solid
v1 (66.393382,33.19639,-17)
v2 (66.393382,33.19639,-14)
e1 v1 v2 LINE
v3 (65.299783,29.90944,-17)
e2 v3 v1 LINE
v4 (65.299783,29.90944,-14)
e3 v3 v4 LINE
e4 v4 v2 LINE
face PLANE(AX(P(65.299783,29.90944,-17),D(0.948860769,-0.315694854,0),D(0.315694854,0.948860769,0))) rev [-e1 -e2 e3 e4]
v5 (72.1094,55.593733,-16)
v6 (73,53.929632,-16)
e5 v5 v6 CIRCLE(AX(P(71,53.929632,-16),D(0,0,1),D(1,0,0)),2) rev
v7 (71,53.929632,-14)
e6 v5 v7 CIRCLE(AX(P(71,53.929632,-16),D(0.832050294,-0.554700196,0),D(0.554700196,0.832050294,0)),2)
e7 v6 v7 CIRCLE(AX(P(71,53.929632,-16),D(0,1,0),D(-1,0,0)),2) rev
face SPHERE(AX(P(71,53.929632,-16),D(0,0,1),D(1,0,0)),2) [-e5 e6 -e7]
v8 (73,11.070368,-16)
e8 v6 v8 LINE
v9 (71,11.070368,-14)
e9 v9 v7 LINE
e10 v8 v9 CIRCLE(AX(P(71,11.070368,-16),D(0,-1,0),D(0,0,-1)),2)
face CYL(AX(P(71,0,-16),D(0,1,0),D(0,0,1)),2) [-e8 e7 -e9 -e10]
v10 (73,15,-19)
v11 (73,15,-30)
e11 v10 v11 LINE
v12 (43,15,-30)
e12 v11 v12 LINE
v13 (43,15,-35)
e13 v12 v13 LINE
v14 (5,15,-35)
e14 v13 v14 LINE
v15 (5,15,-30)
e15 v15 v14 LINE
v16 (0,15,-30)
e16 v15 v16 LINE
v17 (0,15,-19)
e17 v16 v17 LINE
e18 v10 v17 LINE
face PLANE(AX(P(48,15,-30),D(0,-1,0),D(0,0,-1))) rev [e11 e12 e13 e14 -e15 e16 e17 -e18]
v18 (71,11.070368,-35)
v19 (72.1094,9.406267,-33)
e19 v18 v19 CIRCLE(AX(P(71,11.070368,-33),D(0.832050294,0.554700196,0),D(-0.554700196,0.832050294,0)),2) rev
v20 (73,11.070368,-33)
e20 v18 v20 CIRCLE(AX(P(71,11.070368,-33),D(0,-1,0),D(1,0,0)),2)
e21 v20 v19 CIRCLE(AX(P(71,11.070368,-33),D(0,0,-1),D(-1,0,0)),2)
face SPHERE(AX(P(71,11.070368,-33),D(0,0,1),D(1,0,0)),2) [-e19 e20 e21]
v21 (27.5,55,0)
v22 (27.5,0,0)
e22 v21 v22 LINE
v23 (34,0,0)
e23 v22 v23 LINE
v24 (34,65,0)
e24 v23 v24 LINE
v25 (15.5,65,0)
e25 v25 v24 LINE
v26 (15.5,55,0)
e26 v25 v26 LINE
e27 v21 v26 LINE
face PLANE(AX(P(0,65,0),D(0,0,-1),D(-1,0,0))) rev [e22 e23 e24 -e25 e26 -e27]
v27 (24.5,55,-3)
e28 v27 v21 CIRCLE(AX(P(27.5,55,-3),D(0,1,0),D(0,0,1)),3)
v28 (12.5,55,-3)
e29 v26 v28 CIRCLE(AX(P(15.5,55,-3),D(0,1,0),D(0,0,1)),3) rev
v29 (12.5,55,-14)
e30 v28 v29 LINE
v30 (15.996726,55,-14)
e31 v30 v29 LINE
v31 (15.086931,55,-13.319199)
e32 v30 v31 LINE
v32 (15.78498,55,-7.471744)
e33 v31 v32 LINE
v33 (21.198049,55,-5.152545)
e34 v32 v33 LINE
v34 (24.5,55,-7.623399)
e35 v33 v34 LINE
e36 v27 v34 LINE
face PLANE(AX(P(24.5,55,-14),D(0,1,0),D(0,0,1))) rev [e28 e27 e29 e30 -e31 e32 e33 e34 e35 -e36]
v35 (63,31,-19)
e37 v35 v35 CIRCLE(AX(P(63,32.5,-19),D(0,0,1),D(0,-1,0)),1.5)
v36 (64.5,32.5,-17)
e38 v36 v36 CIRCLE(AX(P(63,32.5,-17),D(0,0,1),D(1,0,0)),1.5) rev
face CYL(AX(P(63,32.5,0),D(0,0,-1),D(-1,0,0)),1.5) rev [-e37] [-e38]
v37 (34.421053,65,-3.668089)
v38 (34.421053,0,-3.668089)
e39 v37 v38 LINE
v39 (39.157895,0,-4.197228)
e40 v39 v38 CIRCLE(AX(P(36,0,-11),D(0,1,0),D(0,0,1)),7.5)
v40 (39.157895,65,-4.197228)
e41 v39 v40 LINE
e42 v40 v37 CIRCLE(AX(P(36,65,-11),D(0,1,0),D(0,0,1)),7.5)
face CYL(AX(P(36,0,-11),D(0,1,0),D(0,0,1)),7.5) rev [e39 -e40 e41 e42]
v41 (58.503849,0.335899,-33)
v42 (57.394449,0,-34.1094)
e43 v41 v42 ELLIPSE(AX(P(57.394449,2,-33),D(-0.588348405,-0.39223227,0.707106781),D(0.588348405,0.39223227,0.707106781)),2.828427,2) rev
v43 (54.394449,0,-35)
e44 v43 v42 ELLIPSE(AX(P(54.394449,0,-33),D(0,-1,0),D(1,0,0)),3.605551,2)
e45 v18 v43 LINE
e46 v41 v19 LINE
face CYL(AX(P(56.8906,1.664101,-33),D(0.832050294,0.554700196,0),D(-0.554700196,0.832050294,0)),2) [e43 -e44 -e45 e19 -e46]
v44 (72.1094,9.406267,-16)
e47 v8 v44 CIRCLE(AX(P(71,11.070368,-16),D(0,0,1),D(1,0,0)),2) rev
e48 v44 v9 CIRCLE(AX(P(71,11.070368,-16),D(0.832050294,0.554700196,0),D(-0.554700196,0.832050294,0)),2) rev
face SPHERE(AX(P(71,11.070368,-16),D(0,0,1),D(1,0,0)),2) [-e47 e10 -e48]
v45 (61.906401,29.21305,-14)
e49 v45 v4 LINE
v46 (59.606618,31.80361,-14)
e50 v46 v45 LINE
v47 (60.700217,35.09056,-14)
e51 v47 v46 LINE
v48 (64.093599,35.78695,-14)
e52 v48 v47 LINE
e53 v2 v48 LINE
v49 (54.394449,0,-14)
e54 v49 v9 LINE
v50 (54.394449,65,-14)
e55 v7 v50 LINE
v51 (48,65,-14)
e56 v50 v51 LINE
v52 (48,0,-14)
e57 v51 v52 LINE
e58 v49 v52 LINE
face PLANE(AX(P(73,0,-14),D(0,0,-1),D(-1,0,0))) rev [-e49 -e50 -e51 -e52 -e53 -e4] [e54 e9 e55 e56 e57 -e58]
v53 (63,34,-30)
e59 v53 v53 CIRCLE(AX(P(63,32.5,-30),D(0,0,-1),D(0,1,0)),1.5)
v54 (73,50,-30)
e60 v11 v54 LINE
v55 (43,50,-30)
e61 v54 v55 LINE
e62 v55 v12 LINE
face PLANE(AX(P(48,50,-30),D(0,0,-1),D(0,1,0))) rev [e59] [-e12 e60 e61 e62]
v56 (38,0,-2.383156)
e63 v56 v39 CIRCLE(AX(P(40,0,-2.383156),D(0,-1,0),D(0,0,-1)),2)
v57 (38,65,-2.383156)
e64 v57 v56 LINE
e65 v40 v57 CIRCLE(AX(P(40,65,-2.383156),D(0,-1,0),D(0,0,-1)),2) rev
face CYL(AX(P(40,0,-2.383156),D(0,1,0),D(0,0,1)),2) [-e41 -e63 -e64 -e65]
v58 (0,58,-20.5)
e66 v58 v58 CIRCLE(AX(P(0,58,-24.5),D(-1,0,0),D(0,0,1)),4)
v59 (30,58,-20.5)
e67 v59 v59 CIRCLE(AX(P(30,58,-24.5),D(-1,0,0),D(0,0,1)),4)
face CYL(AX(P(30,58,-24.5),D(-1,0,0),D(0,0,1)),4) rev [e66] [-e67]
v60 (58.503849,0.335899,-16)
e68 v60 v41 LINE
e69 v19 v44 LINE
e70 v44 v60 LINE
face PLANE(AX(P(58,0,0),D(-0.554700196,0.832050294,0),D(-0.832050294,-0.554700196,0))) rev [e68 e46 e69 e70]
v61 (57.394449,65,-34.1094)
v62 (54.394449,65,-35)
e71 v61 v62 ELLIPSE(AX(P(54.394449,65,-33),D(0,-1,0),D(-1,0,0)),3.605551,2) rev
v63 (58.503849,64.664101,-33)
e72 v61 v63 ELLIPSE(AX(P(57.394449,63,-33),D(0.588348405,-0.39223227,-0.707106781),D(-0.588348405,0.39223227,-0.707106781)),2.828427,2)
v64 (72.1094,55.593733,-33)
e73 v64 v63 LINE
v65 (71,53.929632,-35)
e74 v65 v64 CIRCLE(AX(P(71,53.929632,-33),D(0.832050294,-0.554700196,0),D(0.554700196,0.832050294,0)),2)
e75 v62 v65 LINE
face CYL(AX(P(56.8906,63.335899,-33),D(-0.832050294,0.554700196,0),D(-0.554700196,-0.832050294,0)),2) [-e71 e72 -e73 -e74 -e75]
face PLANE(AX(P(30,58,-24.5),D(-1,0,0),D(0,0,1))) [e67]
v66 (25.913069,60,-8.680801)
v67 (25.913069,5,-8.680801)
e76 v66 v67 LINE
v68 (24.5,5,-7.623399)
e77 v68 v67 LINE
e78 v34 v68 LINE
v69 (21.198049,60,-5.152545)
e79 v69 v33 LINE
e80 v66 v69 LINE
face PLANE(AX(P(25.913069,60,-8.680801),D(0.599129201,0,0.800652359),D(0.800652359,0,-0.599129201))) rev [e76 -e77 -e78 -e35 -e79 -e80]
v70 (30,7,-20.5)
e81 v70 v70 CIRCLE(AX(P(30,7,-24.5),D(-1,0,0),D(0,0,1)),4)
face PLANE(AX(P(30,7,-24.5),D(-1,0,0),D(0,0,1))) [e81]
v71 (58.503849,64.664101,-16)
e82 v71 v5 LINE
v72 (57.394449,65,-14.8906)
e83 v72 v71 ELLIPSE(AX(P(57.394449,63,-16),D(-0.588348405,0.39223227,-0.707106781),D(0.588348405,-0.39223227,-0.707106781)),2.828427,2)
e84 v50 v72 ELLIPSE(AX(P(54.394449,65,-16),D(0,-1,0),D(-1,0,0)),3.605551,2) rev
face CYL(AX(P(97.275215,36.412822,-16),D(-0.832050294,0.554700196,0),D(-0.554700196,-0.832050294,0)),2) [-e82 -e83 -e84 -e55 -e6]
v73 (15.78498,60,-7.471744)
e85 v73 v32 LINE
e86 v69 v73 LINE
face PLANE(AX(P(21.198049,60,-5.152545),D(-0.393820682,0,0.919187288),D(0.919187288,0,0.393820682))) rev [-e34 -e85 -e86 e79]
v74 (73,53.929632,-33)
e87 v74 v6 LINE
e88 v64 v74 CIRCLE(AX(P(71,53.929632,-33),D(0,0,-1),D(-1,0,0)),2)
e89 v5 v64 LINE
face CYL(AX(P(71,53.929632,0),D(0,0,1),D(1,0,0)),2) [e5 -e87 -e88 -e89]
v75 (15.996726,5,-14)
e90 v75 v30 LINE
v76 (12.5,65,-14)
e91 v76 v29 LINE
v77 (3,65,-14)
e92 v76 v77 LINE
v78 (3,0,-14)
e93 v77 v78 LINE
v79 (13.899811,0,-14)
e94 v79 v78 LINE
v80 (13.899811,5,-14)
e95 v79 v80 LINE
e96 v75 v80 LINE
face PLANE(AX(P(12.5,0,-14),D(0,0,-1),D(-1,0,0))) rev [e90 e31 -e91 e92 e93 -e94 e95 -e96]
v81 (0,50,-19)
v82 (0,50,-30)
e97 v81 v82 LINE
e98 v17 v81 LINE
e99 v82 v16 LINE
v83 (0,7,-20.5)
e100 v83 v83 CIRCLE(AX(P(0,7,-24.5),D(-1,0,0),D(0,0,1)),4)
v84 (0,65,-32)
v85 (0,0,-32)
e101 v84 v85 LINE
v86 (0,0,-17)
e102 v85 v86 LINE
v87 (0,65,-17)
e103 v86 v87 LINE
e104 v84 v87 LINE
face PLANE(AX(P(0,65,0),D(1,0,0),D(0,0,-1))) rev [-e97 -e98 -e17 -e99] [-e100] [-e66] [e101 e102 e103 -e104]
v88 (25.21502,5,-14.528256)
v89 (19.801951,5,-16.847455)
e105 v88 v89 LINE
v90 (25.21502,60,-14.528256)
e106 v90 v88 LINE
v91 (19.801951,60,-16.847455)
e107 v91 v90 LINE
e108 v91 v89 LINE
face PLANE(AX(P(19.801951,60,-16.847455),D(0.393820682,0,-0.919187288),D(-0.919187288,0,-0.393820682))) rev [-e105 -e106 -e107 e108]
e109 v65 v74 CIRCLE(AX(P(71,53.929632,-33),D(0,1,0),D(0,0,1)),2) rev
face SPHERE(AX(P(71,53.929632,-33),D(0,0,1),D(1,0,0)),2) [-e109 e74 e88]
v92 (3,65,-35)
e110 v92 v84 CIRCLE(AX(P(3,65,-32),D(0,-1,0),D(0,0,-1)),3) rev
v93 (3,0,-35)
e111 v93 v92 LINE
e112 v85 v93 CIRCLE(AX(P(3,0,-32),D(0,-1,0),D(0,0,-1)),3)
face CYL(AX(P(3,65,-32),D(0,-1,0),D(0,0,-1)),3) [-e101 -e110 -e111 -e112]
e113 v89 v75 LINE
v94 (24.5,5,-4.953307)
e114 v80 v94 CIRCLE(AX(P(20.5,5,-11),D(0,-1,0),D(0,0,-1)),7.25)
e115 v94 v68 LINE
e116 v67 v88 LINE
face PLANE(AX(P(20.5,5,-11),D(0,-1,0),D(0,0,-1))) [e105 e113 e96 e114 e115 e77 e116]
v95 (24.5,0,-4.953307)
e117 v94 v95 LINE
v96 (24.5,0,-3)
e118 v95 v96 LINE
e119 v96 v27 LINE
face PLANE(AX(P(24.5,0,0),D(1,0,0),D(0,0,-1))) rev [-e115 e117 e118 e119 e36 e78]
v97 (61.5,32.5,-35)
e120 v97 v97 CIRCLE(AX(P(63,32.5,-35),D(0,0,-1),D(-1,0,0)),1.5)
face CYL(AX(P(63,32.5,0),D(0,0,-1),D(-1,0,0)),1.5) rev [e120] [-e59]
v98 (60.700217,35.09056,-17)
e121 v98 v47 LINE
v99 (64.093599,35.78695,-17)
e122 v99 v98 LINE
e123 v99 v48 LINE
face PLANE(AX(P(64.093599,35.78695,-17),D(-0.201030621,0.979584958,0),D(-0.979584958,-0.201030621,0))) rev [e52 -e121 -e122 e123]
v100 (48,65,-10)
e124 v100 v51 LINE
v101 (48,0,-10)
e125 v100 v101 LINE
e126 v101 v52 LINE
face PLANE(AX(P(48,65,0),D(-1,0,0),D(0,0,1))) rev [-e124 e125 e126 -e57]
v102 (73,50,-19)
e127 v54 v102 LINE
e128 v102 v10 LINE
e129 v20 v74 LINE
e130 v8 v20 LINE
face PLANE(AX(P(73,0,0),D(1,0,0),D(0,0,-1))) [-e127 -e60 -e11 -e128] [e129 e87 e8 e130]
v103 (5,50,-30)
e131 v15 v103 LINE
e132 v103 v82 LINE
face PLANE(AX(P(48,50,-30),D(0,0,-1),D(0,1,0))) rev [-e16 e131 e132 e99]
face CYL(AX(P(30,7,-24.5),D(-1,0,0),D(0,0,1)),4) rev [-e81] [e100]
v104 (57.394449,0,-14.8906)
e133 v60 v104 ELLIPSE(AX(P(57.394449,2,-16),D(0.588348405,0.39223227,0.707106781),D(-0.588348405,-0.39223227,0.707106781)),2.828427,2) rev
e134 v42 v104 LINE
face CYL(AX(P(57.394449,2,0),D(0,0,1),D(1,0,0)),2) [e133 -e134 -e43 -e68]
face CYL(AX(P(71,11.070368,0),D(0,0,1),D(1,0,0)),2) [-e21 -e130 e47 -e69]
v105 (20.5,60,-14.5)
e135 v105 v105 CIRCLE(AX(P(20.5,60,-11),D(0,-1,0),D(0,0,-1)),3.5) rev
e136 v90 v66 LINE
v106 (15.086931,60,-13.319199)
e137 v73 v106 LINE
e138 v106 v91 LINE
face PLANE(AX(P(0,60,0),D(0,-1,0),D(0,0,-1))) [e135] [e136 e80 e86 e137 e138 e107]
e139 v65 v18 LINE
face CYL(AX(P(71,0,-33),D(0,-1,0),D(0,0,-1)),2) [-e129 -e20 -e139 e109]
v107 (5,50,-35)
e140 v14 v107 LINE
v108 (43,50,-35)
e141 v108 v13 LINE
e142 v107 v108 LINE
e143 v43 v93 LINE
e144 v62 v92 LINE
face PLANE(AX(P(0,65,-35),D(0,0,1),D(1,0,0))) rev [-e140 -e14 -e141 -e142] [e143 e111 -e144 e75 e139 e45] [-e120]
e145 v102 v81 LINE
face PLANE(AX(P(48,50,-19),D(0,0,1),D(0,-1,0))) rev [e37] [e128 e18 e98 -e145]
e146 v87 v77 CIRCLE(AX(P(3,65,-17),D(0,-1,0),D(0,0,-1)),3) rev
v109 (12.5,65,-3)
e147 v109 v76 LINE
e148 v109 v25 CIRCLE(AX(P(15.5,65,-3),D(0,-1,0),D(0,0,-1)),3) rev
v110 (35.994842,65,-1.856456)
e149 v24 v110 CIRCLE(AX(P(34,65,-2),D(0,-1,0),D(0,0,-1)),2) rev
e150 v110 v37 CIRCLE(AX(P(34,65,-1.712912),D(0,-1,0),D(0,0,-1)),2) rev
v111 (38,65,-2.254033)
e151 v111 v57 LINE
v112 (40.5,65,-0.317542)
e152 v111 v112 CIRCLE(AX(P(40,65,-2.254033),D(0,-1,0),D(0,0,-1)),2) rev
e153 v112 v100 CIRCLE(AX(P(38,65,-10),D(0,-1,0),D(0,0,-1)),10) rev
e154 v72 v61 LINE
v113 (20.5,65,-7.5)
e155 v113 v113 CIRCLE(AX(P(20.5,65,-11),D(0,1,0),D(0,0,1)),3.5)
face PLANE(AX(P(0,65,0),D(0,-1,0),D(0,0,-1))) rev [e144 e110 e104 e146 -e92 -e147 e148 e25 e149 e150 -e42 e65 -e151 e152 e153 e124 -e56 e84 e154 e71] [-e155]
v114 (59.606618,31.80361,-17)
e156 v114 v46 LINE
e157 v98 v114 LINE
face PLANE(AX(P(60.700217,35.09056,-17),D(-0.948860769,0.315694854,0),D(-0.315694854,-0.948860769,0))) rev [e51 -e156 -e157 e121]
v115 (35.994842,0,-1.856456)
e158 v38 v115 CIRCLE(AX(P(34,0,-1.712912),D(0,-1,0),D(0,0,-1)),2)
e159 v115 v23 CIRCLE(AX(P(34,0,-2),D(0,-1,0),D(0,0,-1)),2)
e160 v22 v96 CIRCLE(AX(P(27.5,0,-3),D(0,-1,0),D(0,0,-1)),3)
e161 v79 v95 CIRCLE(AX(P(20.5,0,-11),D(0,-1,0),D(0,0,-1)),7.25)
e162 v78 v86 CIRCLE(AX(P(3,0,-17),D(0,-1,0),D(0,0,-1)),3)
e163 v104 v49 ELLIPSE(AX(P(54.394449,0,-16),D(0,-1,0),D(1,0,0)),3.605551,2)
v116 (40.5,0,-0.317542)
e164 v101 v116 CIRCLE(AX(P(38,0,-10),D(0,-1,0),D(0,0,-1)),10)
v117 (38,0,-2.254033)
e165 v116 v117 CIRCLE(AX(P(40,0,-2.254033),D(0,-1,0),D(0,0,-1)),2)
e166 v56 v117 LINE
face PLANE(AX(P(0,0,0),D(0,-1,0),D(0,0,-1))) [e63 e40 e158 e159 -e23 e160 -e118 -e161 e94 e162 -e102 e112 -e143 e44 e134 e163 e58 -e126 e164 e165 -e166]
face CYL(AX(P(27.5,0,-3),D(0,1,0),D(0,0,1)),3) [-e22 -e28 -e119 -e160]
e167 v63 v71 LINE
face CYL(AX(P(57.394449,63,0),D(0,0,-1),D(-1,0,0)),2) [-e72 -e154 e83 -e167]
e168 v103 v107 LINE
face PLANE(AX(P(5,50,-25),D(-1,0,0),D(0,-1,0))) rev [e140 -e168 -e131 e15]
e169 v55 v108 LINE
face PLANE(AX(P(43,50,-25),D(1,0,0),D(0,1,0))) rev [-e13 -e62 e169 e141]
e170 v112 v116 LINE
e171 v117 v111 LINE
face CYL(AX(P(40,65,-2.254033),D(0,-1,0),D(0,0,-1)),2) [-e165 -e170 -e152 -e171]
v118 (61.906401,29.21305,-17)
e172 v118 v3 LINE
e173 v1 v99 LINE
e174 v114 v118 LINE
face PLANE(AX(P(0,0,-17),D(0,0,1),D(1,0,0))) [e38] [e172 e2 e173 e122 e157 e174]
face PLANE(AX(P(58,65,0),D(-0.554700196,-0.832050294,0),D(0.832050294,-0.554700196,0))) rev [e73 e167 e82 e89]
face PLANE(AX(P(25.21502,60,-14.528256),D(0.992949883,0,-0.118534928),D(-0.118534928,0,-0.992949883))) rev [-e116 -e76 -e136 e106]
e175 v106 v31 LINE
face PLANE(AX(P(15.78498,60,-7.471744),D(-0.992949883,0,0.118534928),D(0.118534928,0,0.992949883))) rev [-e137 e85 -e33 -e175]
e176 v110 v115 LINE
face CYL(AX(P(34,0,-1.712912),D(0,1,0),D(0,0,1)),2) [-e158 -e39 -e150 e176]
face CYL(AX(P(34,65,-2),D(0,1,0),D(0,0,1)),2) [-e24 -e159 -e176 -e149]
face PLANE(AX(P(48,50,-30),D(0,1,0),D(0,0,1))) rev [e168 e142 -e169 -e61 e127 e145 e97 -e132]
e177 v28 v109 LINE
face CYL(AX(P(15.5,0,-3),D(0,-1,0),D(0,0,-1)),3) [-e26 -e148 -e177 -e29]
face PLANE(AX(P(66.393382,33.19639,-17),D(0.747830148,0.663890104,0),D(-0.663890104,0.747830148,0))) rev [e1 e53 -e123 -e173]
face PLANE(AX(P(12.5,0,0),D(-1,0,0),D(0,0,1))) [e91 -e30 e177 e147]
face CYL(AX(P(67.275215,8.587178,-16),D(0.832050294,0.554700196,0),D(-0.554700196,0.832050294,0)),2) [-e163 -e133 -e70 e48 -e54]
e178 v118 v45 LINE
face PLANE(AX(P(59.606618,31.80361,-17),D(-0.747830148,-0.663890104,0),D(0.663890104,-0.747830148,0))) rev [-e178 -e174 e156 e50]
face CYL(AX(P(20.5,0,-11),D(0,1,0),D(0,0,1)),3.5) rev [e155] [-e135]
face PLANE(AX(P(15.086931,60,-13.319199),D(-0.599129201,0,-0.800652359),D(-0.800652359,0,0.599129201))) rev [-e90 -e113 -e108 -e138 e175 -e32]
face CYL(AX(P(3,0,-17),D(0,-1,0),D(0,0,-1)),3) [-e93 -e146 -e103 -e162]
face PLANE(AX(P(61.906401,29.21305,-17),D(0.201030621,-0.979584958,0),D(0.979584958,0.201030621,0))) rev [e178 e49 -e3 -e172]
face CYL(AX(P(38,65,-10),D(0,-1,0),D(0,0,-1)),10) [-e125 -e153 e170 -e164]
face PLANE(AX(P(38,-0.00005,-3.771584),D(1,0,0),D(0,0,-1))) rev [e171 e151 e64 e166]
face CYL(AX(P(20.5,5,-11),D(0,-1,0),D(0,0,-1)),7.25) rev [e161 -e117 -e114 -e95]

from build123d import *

# Parameters (mm, degrees)
SKETCH1_W           = 48
SKETCH1_H           = 35
BOSS_EXTRUDE1_DEPTH = 65
SKETCH2_R           = 7.5
SKETCH2_R_2         = 3.5
CUT_EXTRUDE1_DEPTH  = 89.056799851
SKETCH3_W           = 14
SKETCH3_H           = 65
CUT_EXTRUDE2_DEPTH  = 12.5
SKETCH4_W           = 14
SKETCH4_H           = 55
CUT_EXTRUDE3_DEPTH  = 12
CUT_EXTRUDE4_DEPTH  = 60
SKETCH6_R           = 7.25
CUT_EXTRUDE5_DEPTH  = 5
SKETCH7_W           = 11
SKETCH7_H           = 35
CUT_EXTRUDE6_DEPTH  = 89.056799851
SKETCH8_R           = 4
CUT_EXTRUDE7_DEPTH  = 30
SKETCH9_W           = 38
SKETCH9_H           = 35
CUT_EXTRUDE8_DEPTH  = 10
FILLET1_R           = 3
SKETCH11_W          = 21
SKETCH11_H          = 65
BOSS_EXTRUDE2_DEPTH = 25
FILLET2_R           = 10
CUT_EXTRUDE9_DEPTH  = 104.821962994
FILLET3_R           = 2
SKETCH13_W          = 11
SKETCH13_H          = 35
CUT_EXTRUDE10_DEPTH = 104.821962994
CUT_EXTRUDE11_DEPTH = 104.821962994
SKETCH16_R          = 1.5
CUT_EXTRUDE13_DEPTH = 104.821962994
CUT_EXTRUDE14_DEPTH = 3
FILLET4_R           = 2


with BuildPart() as part:
    # Sketch1 → Boss-Extrude1 (new body)
    with BuildSketch(Plane(origin=(0, 0, 0), x_dir=(1, 0, 0), z_dir=(0, 1, 0))):
        with Locations((24, 17.5)):
            Rectangle(SKETCH1_W, SKETCH1_H)
    extrude(amount=BOSS_EXTRUDE1_DEPTH)

    # Sketch2 → Cut-Extrude1 (cut, through all)
    with BuildSketch(Plane(origin=(0, 65, 0), x_dir=(1, 0, 0), z_dir=(0, 1, 0))):
        with Locations(Location((36, 11, 0), (0, 0, 270))):
            Circle(SKETCH2_R)
        with Locations(Location((20.5, 11, 0), (0, 0, 270))):
            Circle(SKETCH2_R_2)
    extrude(amount=-CUT_EXTRUDE1_DEPTH, mode=Mode.SUBTRACT)

    # Sketch3 → Cut-Extrude2 (cut)
    with BuildSketch(Plane.ZY):
        with Locations((-7, 32.5)):
            Rectangle(SKETCH3_W, SKETCH3_H)
    extrude(amount=-CUT_EXTRUDE2_DEPTH, mode=Mode.SUBTRACT)

    # Sketch4 → Cut-Extrude3 (cut)
    with BuildSketch(Plane.ZY.offset(-12.5)):
        with Locations((-7, 27.5)):
            Rectangle(SKETCH4_W, SKETCH4_H)
    extrude(amount=-CUT_EXTRUDE3_DEPTH, mode=Mode.SUBTRACT)

    # Sketch5 → Cut-Extrude4 (cut)
    with BuildSketch(Plane.XZ):
        Polygon((25.215019923, -14.528255535), (25.913068886, -8.680800735), (21.198048963, -5.152545199), (15.784980077, -7.471744465), (15.086931114, -13.319199265), (19.801951037, -16.847454801), align=None)
    extrude(amount=-CUT_EXTRUDE4_DEPTH, mode=Mode.SUBTRACT)

    # Sketch6 → Cut-Extrude5 (cut)
    with BuildSketch(Plane(origin=(0, 0, 0), x_dir=(-1, 0, 0), z_dir=(0, -1, 0))):
        with Locations((-20.5, 11)):
            Circle(SKETCH6_R)
    extrude(amount=-CUT_EXTRUDE5_DEPTH, mode=Mode.SUBTRACT)

    # Sketch7 → Cut-Extrude6 (cut, through all)
    with BuildSketch(Plane.ZY):
        with Locations((-24.5, 32.5)):
            Rectangle(SKETCH7_W, SKETCH7_H)
    extrude(amount=-CUT_EXTRUDE6_DEPTH, mode=Mode.SUBTRACT)

    # Sketch8 → Cut-Extrude7 (cut)
    with BuildSketch(Plane.ZY):
        with Locations((-24.5, 58)):
            Circle(SKETCH8_R)
        with Locations((-24.5, 7)):
            Circle(SKETCH8_R)
    extrude(amount=-CUT_EXTRUDE7_DEPTH, mode=Mode.SUBTRACT)

    # Sketch9 → Cut-Extrude8 (cut)
    with BuildSketch(Plane(origin=(0, 0, -35), x_dir=(-1, 0, 0), z_dir=(0, 0, -1))):
        with Locations((-24, 32.5)):
            Rectangle(SKETCH9_W, SKETCH9_H)
    extrude(amount=-CUT_EXTRUDE8_DEPTH, mode=Mode.SUBTRACT)

    # Fillet1
    fillet1_edges = [part.edges().sort_by_distance(p)[0] for p in [
        (0, 32.5, -14),
        (12.5, 60, 0),
        (24.5, 27.5, 0),
        (0, 32.5, -35),
    ]]
    fillet(fillet1_edges, radius=FILLET1_R)

    # Sketch11 → Boss-Extrude2 (add)
    with BuildSketch(Plane(origin=(48, 0, 0), x_dir=(0, 0, -1), z_dir=(1, 0, 0))):
        with Locations((24.5, 32.5)):
            Rectangle(SKETCH11_W, SKETCH11_H)
    extrude(amount=BOSS_EXTRUDE2_DEPTH)

    # Fillet2
    fillet2_edges = [part.edges().sort_by_distance(p)[0] for p in [
        (48, 32.5, 0),
    ]]
    fillet(fillet2_edges, radius=FILLET2_R)

    # Sketch12 → Cut-Extrude9 (cut, through all)
    with BuildSketch(Plane(origin=(0, 65, 0), x_dir=(1, 0, 0), z_dir=(0, 1, 0))):
        Polygon((36, 0), (36, 3.5), (38, 3.771583853), (38, 0), align=None)
    extrude(amount=-CUT_EXTRUDE9_DEPTH, mode=Mode.SUBTRACT)

    # Fillet3
    # the kernel refuses this fillet: 2 mm, written as the material it takes off along each edge
    with BuildSketch(Plane(origin=(38, -6.300214624, 0), x_dir=(0.9920296962671666, 0, -0.12600429248272813), z_dir=(0, 1, 0))) as fillet3_piece_1:
        with BuildLine():
            CenterArc((2.268077265, 1.984059393), FILLET3_R, 172.761243907, 104.477512186)
            Line((0.284017872, 2.236067977), (0, 0))
            ThreePointArc((0, 0), (1.260042925, -0.079703037), (2.52008585, 0))
        make_face()
    extrude(amount=77.600429248, mode=Mode.SUBTRACT)
    with BuildSketch(Plane(origin=(36, 70, 0), x_dir=(-1, 0, 0), z_dir=(0, -1, 0))) as fillet3_piece_2:
        with BuildLine():
            CenterArc((FILLET3_R, FILLET3_R), FILLET3_R, 180, 90)
            Line((0, FILLET3_R), (0, 0))
            Line((0, 0), (FILLET3_R, 0))
        make_face()
    extrude(amount=75, mode=Mode.SUBTRACT)
    with BuildSketch(Plane(origin=(36, 69.467719526, -3.5), x_dir=(0, 0, 1), z_dir=(0, -1, 0))) as fillet3_piece_3:
        with BuildLine():
            CenterArc((1.787087811, 2), FILLET3_R, 192.153197469, 77.846802531)
            ThreePointArc((-0.168088571, 1.578947368), (-0.042140531, 0.793934594), (0, 0))
            Line((0, 0), (1.787087811, 0))
        make_face()
    extrude(amount=73.935439053, mode=Mode.SUBTRACT)
    with BuildSketch(Plane(origin=(38, 68.471069556, -3.771583853), x_dir=(0, 0, 1), z_dir=(0, -1, 0))) as fillet3_piece_4:
        with BuildLine():
            CenterArc((1.388427822, -2), FILLET3_R, 90, 65.09893763)
            ThreePointArc((-0.425644592, -1.157894737), (-0.188974611, -0.587713829), (0, 0))
            Line((0, 0), (1.388427822, 0))
        make_face()
    extrude(amount=71.942139112, mode=Mode.SUBTRACT)

    # Sketch13 → Cut-Extrude10 (cut, through all)
    with BuildSketch(Plane(origin=(73, 0, 0), x_dir=(0, 0, -1), z_dir=(1, 0, 0))):
        with Locations((24.5, 32.5)):
            Rectangle(SKETCH13_W, SKETCH13_H)
    extrude(amount=-CUT_EXTRUDE10_DEPTH, mode=Mode.SUBTRACT)

    # Sketch14 → Cut-Extrude11 (cut, through all)
    with BuildSketch(Plane(origin=(0, 0, -35), x_dir=(-1, 0, 0), z_dir=(0, 0, -1))):
        Polygon((-73, 65), (-58, 65), (-73, 55), align=None)
        Polygon((-73, 0), (-58, 0), (-73, 10), align=None)
    extrude(amount=-CUT_EXTRUDE11_DEPTH, mode=Mode.SUBTRACT)

    # Sketch16 → Cut-Extrude13 (cut, through all)
    with BuildSketch(Plane(origin=(0, 0, -35), x_dir=(-1, 0, 0), z_dir=(0, 0, -1))):
        with Locations((-63, 32.5)):
            Circle(SKETCH16_R)
    extrude(amount=-CUT_EXTRUDE13_DEPTH, mode=Mode.SUBTRACT)

    # Sketch17 → Cut-Extrude14 (cut)
    with BuildSketch(Plane.XY.offset(-14)):
        Polygon((60.700217219, 35.090559623), (59.606618166, 31.8036095), (61.906400947, 29.213049877), (65.299782781, 29.909440377), (66.393381834, 33.1963905), (64.093599053, 35.786950123), align=None)
    extrude(amount=-CUT_EXTRUDE14_DEPTH, mode=Mode.SUBTRACT)

    # Fillet4
    fillet4_edges = [part.edges().sort_by_distance(p)[0] for p in [
        (65.5, 5, -35),
        (65.5, 5, -14),
        (65.5, 60, -35),
        (65.5, 60, -14),
        (73, 32.5, -14),
        (73, 32.5, -35),
        (58, 0, -24.5),
        (73, 10, -24.5),
        (73, 55, -24.5),
        (58, 65, -24.5),
    ]]
    fillet(fillet4_edges, radius=FILLET4_R)


solid = part.part
